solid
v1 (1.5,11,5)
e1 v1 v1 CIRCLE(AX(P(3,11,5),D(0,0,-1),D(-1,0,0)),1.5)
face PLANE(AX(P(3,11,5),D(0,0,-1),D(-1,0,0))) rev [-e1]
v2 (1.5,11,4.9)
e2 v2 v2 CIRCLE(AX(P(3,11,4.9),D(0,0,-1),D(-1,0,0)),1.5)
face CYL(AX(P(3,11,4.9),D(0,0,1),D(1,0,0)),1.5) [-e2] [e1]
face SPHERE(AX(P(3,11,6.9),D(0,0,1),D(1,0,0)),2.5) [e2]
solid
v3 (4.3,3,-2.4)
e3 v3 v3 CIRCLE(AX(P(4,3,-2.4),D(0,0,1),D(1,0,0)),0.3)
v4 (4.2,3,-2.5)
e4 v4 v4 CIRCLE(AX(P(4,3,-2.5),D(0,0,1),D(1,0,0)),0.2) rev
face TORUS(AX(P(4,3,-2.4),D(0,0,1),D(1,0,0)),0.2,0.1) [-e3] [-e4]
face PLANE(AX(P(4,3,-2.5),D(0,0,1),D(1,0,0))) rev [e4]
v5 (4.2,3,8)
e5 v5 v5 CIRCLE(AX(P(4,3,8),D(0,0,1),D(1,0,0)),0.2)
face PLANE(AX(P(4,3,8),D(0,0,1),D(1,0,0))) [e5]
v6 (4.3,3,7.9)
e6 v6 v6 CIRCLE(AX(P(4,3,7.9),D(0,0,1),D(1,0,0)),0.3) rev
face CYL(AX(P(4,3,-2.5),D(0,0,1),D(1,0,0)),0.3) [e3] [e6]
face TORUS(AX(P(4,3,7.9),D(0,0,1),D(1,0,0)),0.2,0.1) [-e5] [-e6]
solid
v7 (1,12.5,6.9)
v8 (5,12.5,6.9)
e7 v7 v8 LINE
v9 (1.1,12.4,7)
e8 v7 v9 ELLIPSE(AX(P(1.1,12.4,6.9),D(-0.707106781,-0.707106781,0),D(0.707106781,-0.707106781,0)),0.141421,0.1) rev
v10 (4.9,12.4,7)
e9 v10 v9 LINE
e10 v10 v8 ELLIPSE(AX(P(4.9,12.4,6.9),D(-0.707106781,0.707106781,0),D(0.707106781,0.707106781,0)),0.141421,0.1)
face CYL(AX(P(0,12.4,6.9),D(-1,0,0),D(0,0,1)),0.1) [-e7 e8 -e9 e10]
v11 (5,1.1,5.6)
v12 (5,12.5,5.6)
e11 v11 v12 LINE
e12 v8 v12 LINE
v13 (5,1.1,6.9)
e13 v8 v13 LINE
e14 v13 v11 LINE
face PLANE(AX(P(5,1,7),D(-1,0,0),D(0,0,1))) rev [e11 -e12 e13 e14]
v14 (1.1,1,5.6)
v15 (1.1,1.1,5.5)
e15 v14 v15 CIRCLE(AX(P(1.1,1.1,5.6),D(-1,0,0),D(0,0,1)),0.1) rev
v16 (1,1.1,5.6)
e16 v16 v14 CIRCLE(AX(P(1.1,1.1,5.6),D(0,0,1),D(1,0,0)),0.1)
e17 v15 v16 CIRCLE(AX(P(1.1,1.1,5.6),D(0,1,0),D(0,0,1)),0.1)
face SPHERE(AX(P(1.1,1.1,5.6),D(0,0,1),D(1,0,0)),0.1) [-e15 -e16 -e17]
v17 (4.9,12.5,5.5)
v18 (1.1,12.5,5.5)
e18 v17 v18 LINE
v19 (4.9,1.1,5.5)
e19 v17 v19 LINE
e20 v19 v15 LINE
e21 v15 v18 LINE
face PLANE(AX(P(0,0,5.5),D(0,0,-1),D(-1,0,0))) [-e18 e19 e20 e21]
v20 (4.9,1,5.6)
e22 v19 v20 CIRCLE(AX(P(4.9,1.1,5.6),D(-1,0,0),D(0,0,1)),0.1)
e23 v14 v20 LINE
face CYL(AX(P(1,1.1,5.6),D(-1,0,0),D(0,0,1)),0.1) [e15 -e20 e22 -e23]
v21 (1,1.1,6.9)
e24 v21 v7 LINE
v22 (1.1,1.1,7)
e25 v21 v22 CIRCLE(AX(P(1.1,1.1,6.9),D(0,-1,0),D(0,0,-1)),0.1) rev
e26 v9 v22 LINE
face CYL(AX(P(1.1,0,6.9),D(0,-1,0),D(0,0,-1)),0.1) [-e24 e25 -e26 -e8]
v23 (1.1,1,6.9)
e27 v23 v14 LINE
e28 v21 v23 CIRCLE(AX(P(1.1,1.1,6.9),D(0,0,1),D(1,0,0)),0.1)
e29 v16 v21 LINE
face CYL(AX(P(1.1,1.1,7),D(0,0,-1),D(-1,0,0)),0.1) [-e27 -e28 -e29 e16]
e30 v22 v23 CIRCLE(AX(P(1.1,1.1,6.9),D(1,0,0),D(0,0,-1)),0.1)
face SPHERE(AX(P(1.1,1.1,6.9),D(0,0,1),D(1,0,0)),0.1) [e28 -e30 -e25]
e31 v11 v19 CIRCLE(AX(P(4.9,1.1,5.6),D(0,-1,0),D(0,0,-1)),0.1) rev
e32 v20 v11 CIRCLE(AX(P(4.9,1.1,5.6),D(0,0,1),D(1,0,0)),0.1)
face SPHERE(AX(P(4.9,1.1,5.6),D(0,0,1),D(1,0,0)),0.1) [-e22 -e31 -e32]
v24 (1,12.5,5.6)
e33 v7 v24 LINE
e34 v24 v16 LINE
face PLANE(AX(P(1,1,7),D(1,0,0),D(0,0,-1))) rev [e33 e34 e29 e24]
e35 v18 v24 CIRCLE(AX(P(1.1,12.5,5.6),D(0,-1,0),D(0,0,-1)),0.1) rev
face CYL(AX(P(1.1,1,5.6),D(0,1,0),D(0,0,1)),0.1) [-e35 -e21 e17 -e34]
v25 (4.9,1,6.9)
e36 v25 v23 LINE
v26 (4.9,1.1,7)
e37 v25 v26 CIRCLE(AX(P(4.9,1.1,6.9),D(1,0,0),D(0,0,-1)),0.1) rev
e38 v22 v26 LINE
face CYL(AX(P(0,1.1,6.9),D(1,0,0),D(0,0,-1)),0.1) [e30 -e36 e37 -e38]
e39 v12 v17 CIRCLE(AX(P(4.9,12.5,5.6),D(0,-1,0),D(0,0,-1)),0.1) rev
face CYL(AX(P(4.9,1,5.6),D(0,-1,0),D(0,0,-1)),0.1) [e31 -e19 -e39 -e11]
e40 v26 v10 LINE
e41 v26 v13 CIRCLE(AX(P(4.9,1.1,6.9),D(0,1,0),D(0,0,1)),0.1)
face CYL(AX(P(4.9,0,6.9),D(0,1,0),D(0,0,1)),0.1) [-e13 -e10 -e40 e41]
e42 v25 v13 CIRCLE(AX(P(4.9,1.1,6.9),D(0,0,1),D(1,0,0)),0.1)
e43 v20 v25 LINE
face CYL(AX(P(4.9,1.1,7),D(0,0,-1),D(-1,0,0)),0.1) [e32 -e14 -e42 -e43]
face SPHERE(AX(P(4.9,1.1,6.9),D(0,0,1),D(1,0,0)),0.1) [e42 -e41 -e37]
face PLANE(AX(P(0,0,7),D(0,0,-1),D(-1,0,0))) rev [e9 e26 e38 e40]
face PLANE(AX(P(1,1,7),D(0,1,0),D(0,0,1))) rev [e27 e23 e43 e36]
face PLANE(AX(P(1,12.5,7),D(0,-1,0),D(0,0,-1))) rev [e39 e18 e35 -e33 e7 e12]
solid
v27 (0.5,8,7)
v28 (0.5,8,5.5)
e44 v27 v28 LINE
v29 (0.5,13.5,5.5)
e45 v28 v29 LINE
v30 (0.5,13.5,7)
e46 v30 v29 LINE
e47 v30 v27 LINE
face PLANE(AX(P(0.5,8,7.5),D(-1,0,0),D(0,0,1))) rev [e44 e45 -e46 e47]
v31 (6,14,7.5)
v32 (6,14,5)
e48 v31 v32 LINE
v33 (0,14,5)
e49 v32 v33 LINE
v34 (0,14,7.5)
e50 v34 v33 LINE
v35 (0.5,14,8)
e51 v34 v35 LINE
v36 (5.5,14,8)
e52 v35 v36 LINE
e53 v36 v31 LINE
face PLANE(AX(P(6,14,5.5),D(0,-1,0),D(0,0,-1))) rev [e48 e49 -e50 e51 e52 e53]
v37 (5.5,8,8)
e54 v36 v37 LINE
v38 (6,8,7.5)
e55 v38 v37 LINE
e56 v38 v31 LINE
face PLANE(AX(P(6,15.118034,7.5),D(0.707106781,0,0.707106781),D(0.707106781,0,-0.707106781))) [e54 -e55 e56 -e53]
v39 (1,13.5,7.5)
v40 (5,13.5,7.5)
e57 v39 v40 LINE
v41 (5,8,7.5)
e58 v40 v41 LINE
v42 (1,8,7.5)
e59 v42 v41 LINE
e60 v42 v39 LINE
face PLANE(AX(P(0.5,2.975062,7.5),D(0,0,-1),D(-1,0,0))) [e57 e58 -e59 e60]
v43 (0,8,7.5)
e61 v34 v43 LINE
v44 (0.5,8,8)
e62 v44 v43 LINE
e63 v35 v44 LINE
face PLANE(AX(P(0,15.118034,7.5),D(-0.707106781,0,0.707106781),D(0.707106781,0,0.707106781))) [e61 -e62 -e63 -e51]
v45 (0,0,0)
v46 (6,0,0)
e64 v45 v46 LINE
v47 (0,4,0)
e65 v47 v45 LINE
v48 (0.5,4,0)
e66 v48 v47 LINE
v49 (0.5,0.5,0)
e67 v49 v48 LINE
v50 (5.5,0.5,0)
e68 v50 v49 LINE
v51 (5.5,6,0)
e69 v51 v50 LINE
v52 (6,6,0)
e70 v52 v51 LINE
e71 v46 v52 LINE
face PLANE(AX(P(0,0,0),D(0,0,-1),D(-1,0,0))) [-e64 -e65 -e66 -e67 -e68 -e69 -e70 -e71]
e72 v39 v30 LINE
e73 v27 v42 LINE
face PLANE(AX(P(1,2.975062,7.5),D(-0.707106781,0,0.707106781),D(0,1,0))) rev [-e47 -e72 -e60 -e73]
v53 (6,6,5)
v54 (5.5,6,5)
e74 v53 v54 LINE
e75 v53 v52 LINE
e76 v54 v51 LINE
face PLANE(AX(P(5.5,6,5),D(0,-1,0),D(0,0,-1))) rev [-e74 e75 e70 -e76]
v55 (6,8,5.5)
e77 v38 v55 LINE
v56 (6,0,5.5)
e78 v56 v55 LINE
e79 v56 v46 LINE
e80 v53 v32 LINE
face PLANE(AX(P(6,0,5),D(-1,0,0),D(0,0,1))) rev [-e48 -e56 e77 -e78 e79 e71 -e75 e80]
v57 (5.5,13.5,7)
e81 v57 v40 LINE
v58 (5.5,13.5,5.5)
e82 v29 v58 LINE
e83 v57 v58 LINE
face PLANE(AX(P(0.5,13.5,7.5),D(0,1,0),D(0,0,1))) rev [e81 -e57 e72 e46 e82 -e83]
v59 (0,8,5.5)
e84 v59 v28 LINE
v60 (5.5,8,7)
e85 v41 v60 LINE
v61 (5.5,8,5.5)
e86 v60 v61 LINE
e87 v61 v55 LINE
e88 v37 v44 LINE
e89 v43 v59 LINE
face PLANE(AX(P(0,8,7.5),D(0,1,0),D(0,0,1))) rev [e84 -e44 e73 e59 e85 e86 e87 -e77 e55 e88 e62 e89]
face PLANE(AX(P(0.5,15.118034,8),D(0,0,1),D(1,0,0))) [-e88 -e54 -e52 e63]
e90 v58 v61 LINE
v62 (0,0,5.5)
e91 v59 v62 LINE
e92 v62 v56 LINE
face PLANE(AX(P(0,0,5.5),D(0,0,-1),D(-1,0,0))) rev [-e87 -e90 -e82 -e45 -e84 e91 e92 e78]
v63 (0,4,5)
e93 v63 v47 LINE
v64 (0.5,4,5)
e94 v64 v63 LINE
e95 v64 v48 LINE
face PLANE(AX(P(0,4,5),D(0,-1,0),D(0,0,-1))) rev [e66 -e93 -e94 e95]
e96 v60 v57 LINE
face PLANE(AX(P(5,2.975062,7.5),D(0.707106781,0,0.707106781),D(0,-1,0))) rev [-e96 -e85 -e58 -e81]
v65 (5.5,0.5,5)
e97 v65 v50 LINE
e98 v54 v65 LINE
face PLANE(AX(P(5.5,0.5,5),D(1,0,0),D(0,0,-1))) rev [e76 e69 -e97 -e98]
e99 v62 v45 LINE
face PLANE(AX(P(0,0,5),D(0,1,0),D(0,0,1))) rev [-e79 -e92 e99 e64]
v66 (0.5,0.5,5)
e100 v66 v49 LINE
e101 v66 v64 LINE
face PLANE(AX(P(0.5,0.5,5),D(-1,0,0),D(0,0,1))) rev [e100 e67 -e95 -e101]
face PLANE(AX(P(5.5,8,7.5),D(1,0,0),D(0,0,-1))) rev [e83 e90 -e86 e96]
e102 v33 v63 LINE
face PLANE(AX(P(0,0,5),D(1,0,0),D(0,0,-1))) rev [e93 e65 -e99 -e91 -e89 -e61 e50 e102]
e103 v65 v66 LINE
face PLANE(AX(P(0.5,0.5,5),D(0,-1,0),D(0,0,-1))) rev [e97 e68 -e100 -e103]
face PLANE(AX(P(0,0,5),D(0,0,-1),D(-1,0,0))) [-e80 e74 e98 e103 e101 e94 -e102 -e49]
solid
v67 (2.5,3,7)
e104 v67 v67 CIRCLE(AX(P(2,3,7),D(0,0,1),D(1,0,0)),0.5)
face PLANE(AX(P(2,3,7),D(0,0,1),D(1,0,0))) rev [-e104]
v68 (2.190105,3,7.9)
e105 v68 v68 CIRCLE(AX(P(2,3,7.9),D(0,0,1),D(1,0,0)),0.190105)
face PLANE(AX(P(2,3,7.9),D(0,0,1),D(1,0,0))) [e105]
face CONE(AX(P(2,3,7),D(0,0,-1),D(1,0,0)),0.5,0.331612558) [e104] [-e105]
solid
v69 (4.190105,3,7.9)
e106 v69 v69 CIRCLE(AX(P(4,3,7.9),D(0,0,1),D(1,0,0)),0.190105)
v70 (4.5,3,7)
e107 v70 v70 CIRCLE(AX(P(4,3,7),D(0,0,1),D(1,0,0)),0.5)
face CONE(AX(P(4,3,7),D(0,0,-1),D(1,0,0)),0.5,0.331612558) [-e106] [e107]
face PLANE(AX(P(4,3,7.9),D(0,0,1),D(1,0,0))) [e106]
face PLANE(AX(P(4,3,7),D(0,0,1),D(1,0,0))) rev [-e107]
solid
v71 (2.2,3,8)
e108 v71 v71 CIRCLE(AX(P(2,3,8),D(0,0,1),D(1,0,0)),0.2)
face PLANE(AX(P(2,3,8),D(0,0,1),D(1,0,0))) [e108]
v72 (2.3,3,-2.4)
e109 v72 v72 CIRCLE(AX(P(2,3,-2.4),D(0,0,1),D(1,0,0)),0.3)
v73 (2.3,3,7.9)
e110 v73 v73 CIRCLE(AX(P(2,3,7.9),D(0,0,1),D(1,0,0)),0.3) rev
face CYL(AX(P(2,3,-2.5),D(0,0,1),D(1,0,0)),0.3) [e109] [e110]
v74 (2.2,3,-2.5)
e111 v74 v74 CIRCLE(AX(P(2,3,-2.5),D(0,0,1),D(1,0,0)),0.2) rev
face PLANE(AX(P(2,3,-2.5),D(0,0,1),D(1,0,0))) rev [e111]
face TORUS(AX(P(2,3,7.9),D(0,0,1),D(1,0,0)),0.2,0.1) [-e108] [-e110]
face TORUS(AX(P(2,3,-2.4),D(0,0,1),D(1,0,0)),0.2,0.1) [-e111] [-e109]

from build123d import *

# Parameters (mm, degrees)
BOSS_EXTRUDE1_DEPTH           = 5
BOSS_EXTRUDE2_DEPTH           = 0.5
BOSS_EXTRUDE3_DEPTH           = 2
BOSS_EXTRUDE4_REACH           = 14.5
BOSS_EXTRUDE5_DEPTH           = 6
SKETCH10_W                    = 4
SKETCH10_H                    = 11.5
BOSS_EXTRUDE6_DEPTH           = 1.5
FILLET1_R                     = 0.1
CHAMFER1_SIZE                 = 0.5
SKETCH11_R                    = 1.5
BOSS_EXTRUDE7_DEPTH           = 0.1
FILLET2_R                     = 0.1
BOSS_EXTRUDE8_DEPTH           = 1
BOSS_EXTRUDE8_DEPTH_BACK      = 9.5
SKETCH12_R                    = 0.3
BOSS_EXTRUDE8_2_DEPTH         = 1
BOSS_EXTRUDE8_2_DEPTH_BACK    = 9.5
FILLET4_R                     = 0.1
FILLET5_R                     = 0.1
SKETCH13_R                    = 0.5
BOSS_EXTRUDE9_DEPTH           = 0.9
BOSS_EXTRUDE9_DRAFT           = 19
BOSS_EXTRUDE9_PROFILE_2_DEPTH = 0.9
BOSS_EXTRUDE9_PROFILE_2_DRAFT = 19


# Read off the part's stored shape, not the designer's step: Dome1
with BuildPart() as part:
    # Sketch1 → Boss-Extrude1 (new body)
    with BuildSketch(Plane.XY):
        Polygon((0.5, 0.5), (0.5, 4), (0, 4), (0, 0), (6, 0), (6, 6), (5.5, 6), (5.5, 0.5), align=None)
    extrude(amount=BOSS_EXTRUDE1_DEPTH)

    # Sketch2 → Boss-Extrude2 (add)
    with BuildSketch(Plane.XY.offset(5)):
        Polygon((6, 6), (6, 14), (0, 14), (0, 4), (0, 0), (6, 0), align=None)
    extrude(amount=BOSS_EXTRUDE2_DEPTH)

    # Sketch3 → Boss-Extrude3 (add)
    with BuildSketch(Plane.XY.offset(5.5)):
        Polygon((0, 14), (6, 14), (6, 8), (5.5, 8), (5.5, 13.5), (0.5, 13.5), (0.5, 8), (0, 8), align=None)
    extrude(amount=BOSS_EXTRUDE3_DEPTH)

    # Boss-Extrude4: up to this face of the body (flat: up to its plane)
    boss_extrude4_end = Plane(part.part.faces().sort_by_distance((3, 14, 6.25))[0])
    # Sketch8 → Boss-Extrude4 (add, up to the picked face)
    with BuildSketch(Plane(origin=(0, 8, 0), x_dir=(-1, 0, 0), z_dir=(0, -1, 0)), mode=Mode.PRIVATE) as boss_extrude4_sk1:
        Polygon((-0.5, -7.5), (-1, -8), (-0.5, -8), (0, -7.5), align=None)
    boss_extrude4_tool1 = split(extrude(boss_extrude4_sk1.sketch, amount=-BOSS_EXTRUDE4_REACH, mode=Mode.PRIVATE), bisect_by=boss_extrude4_end, keep=Keep.BOTH, mode=Mode.PRIVATE)
    # Sketch8 → Boss-Extrude4 (add, up to the picked face)
    with BuildSketch(Plane(origin=(0, 8, 0), x_dir=(-1, 0, 0), z_dir=(0, -1, 0)), mode=Mode.PRIVATE) as boss_extrude4_sk2:
        Polygon((-6, -7.5), (-5.5, -7.5), (-5, -8), (-5.5, -8), align=None)
    boss_extrude4_tool2 = split(extrude(boss_extrude4_sk2.sketch, amount=-BOSS_EXTRUDE4_REACH, mode=Mode.PRIVATE), bisect_by=boss_extrude4_end, keep=Keep.BOTH, mode=Mode.PRIVATE)
    add(boss_extrude4_tool1.solids().sort_by(Axis((0.5, 8, 7.75), (0, 1, 0)))[0])
    add(boss_extrude4_tool2.solids().sort_by(Axis((5.5, 8, 7.75), (0, 1, 0)))[0])

    # Sketch9 → Boss-Extrude5 (add)
    with BuildSketch(Plane(origin=(0, 14, 0), x_dir=(1, 0, 0), z_dir=(0, 1, 0))):
        Polygon((0.5, -7.5), (5.5, -7.5), (5, -8), (1, -8), align=None)
    extrude(amount=-BOSS_EXTRUDE5_DEPTH)

    # Chamfer1
    chamfer1_edges = [part.edges().sort_by_distance(p)[0] for p in [
        (0.5, 10.75, 7.5),
        (5.5, 10.75, 7.5),
    ]]
    chamfer(chamfer1_edges, length=CHAMFER1_SIZE)


with BuildPart() as body_2:
    # Sketch10 → Boss-Extrude6 (new body)
    with BuildSketch(Plane.XY.offset(5.5)):
        with Locations((3, 6.75)):
            Rectangle(SKETCH10_W, SKETCH10_H)
    extrude(amount=BOSS_EXTRUDE6_DEPTH)

    # Fillet1
    fillet1_edges = [body_2.edges().sort_by_distance(p)[0] for p in [
        (5, 6.75, 7),
        (3, 12.5, 7),
        (1, 6.75, 7),
        (5, 6.75, 5.5),
        (3, 1, 5.5),
        (1, 6.75, 5.5),
        (3, 1, 7),
    ]]
    fillet(fillet1_edges, radius=FILLET1_R)

    # Fillet2
    # the kernel refuses this fillet: 0.1 mm, written as the material it takes off along each edge
    with BuildSketch(Plane(origin=(4.9, 1.1, 6.9), x_dir=(1, 0, 0), z_dir=(0, -1, 0))) as fillet2_piece_1_section:
        Polygon((0, 0), (FILLET2_R, 0), (FILLET2_R, FILLET2_R), (0, FILLET2_R), align=None)
    fillet2_piece_1 = extrude(amount=FILLET2_R, mode=Mode.PRIVATE)
    fillet2_piece_1 = fillet2_piece_1 - Plane(origin=(4.9, 1.1, 6.9), x_dir=(-0.7071067811865475, 0, -0.7071067811865475), z_dir=(0, -1, 0)) * Sphere(FILLET2_R, mode=Mode.PRIVATE)
    add(fillet2_piece_1, mode=Mode.SUBTRACT)
    with BuildSketch(Plane(origin=(1.1, 1.1, 6.9), x_dir=(-1, 0, 0), z_dir=(0, -1, 0))) as fillet2_piece_2_section:
        Polygon((0, 0), (FILLET2_R, 0), (FILLET2_R, -FILLET2_R), (0, -FILLET2_R), align=None)
    fillet2_piece_2 = extrude(amount=FILLET2_R, mode=Mode.PRIVATE)
    fillet2_piece_2 = fillet2_piece_2 - Plane(origin=(1.1, 1.1, 6.9), x_dir=(0.7071067811865475, 0, -0.7071067811865475), z_dir=(0, -1, 0)) * Sphere(FILLET2_R, mode=Mode.PRIVATE)
    add(fillet2_piece_2, mode=Mode.SUBTRACT)
    with BuildSketch(Plane(origin=(1.1, 1.1, 5.6), x_dir=(-1, 0, 0), z_dir=(0, -1, 0))) as fillet2_piece_3_section:
        Polygon((0, 0), (FILLET2_R, 0), (FILLET2_R, FILLET2_R), (0, FILLET2_R), align=None)
    fillet2_piece_3 = extrude(amount=FILLET2_R, mode=Mode.PRIVATE)
    fillet2_piece_3 = fillet2_piece_3 - Plane(origin=(1.1, 1.1, 5.6), x_dir=(0.7071067811865475, 0, 0.7071067811865475), z_dir=(0, -1, 0)) * Sphere(FILLET2_R, mode=Mode.PRIVATE)
    add(fillet2_piece_3, mode=Mode.SUBTRACT)
    with BuildSketch(Plane(origin=(4.9, 1.1, 5.6), x_dir=(1, 0, 0), z_dir=(0, -1, 0))) as fillet2_piece_4_section:
        Polygon((0, 0), (FILLET2_R, 0), (FILLET2_R, -FILLET2_R), (0, -FILLET2_R), align=None)
    fillet2_piece_4 = extrude(amount=FILLET2_R, mode=Mode.PRIVATE)
    fillet2_piece_4 = fillet2_piece_4 - Plane(origin=(4.9, 1.1, 5.6), x_dir=(-0.7071067811865475, 0, 0.7071067811865475), z_dir=(0, -1, 0)) * Sphere(FILLET2_R, mode=Mode.PRIVATE)
    add(fillet2_piece_4, mode=Mode.SUBTRACT)
    with BuildSketch(Plane(origin=(5, 1, 5.6), x_dir=(-1, 0, 0), z_dir=(0, 0, 1))) as fillet2_piece_5:
        with BuildLine():
            CenterArc((FILLET2_R, -FILLET2_R), FILLET2_R, 90, 90)
            Line((0, -FILLET2_R), (0, 0))
            Line((0, 0), (FILLET2_R, 0))
        make_face()
    extrude(amount=1.3, mode=Mode.SUBTRACT)
    with BuildSketch(Plane(origin=(1, 1, 5.6), x_dir=(1, 0, 0), z_dir=(0, 0, 1))) as fillet2_piece_6:
        with BuildLine():
            CenterArc((FILLET2_R, FILLET2_R), FILLET2_R, 180, 90)
            Line((0, FILLET2_R), (0, 0))
            Line((0, 0), (FILLET2_R, 0))
        make_face()
    extrude(amount=1.3, mode=Mode.SUBTRACT)


with BuildPart() as body_3:
    # Sketch11 → Boss-Extrude7 (new body)
    with BuildSketch(Plane(origin=(0, 0, 5), x_dir=(-1, 0, 0), z_dir=(0, 0, -1))):
        with Locations((-3, 11)):
            Circle(SKETCH11_R)
    extrude(amount=BOSS_EXTRUDE7_DEPTH)

    # Dome1 outline → Dome1 (revolve)
    with BuildSketch(Plane(origin=(3, 11, 0), x_dir=(1, 0, 0), z_dir=(0, -1, 0))):
        with BuildLine():
            Line((0, 4.900000002), (0, 4.4))
            ThreePointArc((0, 4.4), (0.790569416, 4.528291755), (1.500000002, 4.900000002))
            Line((1.500000002, 4.900000002), (0, 4.900000002))
        make_face()
    revolve(axis=Axis((3, 11, 0), (0, 0, 1)))


with BuildPart() as body_4:
    # Sketch12 → Boss-Extrude8 (new, two sides: drawn at the far end of the back side and taken through both)
    with BuildSketch(Plane.XY.offset(7).offset(-BOSS_EXTRUDE8_DEPTH_BACK)):
        with Locations((2, 3)):
            Circle(SKETCH12_R)
    extrude(amount=BOSS_EXTRUDE8_DEPTH + BOSS_EXTRUDE8_DEPTH_BACK)

    # Fillet5
    fillet5_edges = [body_4.edges().sort_by_distance(p)[0] for p in [
        (1.7, 3, -2.5),
        (1.7, 3, 8),
    ]]
    fillet(fillet5_edges, radius=FILLET5_R)


with BuildPart() as body_5:
    # Sketch12 → Boss-Extrude8 2 (new, two sides: drawn at the far end of the back side and taken through both)
    with BuildSketch(Plane.XY.offset(7).offset(-BOSS_EXTRUDE8_2_DEPTH_BACK)):
        with Locations((4, 3)):
            Circle(SKETCH12_R)
    extrude(amount=BOSS_EXTRUDE8_2_DEPTH + BOSS_EXTRUDE8_2_DEPTH_BACK)

    # Fillet4
    fillet4_edges = [body_5.edges().sort_by_distance(p)[0] for p in [
        (3.7, 3, -2.5),
        (3.7, 3, 8),
    ]]
    fillet(fillet4_edges, radius=FILLET4_R)


with BuildPart() as body_6:
    # Sketch13 → Boss-Extrude9 (with draft: the straight prism first)
    with BuildSketch(Plane.XY.offset(7)):
        with Locations((2, 3)):
            Circle(SKETCH13_R)
    extrude(amount=BOSS_EXTRUDE9_DEPTH)
    # Boss-Extrude9: the draft: its side faces are tilted about the plane it starts from
    boss_extrude9_sides = [body_6.faces().sort_by_distance(p)[0] for p in [
        (1.5, 3, 7.45),
    ]]
    draft(boss_extrude9_sides, Plane.XY.offset(7), BOSS_EXTRUDE9_DRAFT)


with BuildPart() as body_7:
    # Sketch13 → Boss-Extrude9 profile 2 (with draft: the straight prism first)
    with BuildSketch(Plane.XY.offset(7)):
        with Locations((4, 3)):
            Circle(SKETCH13_R)
    extrude(amount=BOSS_EXTRUDE9_PROFILE_2_DEPTH)
    # Boss-Extrude9 profile 2: the draft: its side faces are tilted about the plane it starts from
    boss_extrude9_profile_2_sides = [body_7.faces().sort_by_distance(p)[0] for p in [
        (3.5, 3, 7.45),
    ]]
    draft(boss_extrude9_profile_2_sides, Plane.XY.offset(7), BOSS_EXTRUDE9_PROFILE_2_DRAFT)


solid = Compound([part.part, body_2.part, body_3.part, body_4.part, body_5.part, body_6.part, body_7.part])
